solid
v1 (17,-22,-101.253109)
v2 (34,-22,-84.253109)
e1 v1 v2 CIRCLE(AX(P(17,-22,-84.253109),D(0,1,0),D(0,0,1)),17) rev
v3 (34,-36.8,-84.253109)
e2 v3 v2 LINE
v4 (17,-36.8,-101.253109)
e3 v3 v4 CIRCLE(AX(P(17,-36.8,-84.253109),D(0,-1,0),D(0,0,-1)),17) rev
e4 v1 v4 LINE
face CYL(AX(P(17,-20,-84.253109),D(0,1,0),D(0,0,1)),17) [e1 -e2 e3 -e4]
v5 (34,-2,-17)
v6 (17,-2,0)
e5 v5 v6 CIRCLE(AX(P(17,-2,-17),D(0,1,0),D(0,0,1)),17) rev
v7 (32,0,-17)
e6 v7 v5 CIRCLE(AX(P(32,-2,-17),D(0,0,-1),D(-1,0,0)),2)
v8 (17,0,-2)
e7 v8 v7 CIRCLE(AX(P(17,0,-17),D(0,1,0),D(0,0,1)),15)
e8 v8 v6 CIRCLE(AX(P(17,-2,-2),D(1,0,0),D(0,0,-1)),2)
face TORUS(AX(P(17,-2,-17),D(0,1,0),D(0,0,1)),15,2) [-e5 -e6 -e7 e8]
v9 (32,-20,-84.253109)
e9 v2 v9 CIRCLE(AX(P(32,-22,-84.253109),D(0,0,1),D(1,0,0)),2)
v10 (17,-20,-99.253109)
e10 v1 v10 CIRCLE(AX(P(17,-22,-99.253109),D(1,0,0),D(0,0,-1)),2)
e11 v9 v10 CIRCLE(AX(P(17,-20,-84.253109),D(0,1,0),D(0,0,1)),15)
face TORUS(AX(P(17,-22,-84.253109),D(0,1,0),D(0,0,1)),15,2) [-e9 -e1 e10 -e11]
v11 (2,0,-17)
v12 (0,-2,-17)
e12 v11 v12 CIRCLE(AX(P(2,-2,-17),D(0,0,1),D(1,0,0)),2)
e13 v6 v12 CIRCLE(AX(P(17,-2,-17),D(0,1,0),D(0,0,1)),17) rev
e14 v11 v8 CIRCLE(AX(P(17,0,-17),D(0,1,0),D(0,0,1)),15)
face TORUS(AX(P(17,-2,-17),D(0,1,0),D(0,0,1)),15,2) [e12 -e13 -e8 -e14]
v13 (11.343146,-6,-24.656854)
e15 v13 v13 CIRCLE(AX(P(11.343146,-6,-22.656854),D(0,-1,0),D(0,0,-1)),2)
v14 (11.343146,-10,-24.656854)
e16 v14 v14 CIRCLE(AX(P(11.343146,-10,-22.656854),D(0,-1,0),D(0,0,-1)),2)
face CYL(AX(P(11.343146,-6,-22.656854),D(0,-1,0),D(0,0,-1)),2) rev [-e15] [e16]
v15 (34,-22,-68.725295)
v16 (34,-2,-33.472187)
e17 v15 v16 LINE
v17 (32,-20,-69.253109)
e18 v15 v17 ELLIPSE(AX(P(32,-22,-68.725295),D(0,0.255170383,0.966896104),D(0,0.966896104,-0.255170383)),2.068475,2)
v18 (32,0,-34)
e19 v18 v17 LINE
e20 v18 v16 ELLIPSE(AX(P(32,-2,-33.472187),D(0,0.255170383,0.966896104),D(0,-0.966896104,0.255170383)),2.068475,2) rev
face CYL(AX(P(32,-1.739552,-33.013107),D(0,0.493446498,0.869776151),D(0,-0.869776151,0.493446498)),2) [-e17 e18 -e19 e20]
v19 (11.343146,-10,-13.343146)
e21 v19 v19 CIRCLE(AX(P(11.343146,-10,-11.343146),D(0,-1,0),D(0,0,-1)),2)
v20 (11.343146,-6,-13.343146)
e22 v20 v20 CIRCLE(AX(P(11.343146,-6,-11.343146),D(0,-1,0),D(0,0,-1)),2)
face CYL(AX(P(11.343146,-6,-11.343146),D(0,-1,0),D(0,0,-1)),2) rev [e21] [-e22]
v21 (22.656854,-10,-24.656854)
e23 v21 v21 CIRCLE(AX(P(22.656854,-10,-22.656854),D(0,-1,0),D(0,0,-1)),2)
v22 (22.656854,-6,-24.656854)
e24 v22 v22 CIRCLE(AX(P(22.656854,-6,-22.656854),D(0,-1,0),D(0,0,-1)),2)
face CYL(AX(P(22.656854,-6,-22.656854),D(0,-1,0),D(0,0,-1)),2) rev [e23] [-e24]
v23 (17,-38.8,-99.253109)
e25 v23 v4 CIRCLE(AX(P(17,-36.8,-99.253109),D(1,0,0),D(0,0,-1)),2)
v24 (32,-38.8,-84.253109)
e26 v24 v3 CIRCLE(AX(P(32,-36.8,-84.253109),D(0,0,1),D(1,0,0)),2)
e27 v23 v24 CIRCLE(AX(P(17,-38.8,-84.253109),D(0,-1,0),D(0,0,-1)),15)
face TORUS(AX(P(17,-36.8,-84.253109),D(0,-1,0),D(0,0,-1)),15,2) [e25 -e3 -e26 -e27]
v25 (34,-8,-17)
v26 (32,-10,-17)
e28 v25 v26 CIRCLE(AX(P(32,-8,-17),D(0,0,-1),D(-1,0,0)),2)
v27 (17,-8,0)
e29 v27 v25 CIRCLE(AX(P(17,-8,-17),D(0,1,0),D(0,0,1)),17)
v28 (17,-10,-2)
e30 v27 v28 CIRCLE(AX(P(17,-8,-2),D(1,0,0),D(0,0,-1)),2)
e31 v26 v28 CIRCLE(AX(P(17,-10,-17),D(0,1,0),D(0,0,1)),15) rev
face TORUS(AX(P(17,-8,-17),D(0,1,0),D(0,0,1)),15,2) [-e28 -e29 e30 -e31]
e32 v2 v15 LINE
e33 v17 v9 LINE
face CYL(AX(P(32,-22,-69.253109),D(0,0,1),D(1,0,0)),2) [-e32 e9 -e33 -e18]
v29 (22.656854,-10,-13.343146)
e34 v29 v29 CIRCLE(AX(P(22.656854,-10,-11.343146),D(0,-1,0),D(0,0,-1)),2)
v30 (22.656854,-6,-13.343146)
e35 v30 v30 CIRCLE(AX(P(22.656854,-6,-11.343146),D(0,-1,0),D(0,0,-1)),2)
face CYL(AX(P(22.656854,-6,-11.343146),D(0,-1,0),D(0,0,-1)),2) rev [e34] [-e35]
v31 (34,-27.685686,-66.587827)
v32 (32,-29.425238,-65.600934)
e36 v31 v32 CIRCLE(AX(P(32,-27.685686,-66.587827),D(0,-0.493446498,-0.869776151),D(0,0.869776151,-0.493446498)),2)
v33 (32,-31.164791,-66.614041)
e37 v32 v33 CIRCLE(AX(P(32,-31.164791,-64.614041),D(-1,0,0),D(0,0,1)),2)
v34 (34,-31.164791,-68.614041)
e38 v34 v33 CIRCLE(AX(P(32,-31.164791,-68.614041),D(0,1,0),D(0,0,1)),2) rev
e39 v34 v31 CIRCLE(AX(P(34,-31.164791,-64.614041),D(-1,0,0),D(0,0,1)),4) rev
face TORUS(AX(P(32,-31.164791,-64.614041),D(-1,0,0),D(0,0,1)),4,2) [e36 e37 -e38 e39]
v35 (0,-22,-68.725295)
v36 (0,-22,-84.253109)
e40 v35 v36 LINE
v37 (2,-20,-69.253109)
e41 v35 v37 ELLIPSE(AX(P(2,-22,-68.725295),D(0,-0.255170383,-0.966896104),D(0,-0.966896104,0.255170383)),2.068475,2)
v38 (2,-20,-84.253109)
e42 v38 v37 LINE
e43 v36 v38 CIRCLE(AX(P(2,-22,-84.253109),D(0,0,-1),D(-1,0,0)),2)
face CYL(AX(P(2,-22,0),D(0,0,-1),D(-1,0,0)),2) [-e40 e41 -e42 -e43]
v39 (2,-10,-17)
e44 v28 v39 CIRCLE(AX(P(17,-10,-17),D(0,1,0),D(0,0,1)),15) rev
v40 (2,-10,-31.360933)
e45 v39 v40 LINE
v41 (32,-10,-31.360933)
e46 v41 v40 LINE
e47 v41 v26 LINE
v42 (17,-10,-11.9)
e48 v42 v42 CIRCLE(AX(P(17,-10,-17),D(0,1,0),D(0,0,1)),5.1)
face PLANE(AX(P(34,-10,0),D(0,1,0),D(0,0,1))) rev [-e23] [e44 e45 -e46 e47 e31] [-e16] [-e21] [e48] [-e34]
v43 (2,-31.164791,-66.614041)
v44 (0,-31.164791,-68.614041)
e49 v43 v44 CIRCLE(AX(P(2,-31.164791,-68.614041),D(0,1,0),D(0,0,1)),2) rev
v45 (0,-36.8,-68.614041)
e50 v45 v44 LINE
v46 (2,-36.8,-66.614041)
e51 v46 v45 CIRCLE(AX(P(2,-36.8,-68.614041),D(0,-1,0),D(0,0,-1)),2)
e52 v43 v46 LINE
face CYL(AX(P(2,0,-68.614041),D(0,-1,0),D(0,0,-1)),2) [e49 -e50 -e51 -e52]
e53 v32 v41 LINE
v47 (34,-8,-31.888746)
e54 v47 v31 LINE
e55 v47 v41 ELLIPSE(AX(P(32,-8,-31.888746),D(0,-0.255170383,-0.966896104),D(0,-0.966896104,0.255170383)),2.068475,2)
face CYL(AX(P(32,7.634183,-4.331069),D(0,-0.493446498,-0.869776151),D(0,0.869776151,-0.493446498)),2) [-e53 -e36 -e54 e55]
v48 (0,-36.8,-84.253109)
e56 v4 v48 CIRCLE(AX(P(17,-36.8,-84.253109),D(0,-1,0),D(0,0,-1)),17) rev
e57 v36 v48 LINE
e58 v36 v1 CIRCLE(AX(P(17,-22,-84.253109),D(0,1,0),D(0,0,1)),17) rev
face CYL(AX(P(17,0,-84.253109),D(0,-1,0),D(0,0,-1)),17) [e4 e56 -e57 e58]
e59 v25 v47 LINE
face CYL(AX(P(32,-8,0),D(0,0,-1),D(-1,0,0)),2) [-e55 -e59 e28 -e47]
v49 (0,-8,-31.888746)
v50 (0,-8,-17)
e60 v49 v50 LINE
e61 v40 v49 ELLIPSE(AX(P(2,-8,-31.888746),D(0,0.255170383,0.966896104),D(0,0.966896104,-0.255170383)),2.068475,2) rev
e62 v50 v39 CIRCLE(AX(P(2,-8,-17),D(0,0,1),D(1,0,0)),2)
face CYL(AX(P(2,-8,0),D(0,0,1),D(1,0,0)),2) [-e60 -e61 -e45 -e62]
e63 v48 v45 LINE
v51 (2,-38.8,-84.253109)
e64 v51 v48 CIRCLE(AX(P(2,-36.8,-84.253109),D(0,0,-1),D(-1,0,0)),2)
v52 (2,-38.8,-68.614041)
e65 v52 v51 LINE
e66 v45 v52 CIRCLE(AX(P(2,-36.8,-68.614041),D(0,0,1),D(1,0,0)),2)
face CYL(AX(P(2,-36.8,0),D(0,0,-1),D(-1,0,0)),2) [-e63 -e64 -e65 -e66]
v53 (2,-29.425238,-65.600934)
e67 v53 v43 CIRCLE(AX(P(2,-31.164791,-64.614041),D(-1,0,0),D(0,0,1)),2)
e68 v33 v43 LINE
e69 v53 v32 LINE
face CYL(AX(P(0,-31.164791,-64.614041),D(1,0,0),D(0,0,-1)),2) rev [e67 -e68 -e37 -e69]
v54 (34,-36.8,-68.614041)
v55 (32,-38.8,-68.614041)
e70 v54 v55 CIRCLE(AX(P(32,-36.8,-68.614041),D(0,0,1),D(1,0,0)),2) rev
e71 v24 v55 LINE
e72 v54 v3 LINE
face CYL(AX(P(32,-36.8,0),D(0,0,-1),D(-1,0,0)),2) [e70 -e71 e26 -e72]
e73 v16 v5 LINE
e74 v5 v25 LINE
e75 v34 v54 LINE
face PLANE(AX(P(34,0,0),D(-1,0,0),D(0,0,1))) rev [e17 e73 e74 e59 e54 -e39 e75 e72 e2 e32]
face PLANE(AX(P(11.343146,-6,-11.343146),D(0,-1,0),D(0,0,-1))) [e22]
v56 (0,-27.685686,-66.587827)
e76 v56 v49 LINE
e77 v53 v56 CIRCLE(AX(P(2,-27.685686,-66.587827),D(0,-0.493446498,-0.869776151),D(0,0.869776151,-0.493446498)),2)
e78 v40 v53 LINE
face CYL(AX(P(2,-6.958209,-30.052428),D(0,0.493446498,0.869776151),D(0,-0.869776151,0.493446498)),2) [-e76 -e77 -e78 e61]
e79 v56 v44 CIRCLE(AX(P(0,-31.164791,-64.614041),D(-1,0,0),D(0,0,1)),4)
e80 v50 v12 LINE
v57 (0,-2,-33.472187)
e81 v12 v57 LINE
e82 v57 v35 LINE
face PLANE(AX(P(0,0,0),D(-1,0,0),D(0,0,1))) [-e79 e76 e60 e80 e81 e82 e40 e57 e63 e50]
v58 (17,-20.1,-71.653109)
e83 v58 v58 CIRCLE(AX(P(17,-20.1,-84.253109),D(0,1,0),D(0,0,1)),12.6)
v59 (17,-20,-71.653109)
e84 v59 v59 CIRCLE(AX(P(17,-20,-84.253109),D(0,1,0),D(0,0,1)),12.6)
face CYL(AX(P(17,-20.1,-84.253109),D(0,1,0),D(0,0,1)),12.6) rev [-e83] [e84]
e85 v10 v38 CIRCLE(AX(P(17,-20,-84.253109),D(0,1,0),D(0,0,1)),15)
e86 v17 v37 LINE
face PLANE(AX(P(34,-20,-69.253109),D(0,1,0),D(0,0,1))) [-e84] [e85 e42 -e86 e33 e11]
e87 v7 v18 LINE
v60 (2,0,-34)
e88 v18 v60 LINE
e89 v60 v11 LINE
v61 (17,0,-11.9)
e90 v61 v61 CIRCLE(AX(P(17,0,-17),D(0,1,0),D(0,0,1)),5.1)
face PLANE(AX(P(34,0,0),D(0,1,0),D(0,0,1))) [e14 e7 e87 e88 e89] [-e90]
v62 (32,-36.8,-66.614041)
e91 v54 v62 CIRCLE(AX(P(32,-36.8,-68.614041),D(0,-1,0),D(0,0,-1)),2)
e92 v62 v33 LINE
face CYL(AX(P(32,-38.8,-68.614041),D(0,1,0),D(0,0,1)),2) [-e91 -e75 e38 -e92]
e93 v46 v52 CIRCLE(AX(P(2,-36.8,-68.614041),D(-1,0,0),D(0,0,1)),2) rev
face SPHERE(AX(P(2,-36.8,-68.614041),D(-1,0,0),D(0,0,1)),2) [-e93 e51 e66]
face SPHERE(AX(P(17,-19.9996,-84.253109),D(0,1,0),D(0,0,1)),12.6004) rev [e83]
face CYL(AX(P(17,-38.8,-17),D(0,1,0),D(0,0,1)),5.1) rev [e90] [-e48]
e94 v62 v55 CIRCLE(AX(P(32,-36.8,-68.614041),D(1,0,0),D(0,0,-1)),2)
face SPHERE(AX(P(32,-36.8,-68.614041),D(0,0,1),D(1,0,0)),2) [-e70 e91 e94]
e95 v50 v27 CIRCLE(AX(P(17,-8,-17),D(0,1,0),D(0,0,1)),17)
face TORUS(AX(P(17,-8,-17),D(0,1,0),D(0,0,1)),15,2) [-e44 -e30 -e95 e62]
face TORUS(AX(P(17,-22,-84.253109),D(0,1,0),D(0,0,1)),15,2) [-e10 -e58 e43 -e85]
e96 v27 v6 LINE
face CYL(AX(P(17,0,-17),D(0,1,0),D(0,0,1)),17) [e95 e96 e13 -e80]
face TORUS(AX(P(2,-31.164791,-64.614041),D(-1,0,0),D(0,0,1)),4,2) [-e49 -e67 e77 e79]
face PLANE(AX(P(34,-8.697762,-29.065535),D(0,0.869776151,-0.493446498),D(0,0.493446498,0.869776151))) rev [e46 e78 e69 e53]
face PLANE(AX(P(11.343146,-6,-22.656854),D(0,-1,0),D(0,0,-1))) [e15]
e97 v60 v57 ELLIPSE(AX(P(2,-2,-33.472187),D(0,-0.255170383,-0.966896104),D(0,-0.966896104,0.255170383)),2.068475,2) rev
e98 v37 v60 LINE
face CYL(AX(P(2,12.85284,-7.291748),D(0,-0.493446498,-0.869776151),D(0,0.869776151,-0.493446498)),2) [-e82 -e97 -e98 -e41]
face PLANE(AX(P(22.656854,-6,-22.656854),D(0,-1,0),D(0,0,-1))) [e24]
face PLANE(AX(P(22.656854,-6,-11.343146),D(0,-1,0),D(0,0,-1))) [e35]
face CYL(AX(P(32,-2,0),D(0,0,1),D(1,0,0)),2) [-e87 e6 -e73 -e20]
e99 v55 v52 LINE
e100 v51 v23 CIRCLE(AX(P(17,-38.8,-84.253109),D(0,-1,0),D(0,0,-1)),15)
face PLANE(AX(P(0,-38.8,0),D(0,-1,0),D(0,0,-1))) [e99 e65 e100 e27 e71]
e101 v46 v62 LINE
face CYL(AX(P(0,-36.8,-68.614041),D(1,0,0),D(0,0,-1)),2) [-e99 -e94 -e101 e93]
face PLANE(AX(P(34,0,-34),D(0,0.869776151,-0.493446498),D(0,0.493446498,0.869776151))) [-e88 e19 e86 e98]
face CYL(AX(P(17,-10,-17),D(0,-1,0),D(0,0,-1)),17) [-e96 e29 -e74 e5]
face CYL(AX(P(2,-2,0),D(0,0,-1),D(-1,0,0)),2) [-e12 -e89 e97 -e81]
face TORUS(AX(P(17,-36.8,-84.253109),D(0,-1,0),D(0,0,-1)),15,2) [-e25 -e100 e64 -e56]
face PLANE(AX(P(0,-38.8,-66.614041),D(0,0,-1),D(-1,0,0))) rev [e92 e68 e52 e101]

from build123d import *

# Parameters (mm, degrees)
PROFILEEXTRUDE_THIN1_DEPTH          = 34
DOMEPADEXTENSIONSKETCH1_W           = 34
DOMEPADEXTENSIONSKETCH1_H           = 34.639067238
DOMEPADEXTENSIONBOSS_EXTRUDE1_DEPTH = 8.8
FILLET1_R                           = 17
FILLET2_R                           = 17
FLANGENUTHOLESKETCH4_R              = 5.1
FLANGENUTHOLECUT_EXTRUDE5_DEPTH     = 114.638162666
DOMEINDENTSKETCH6_R                 = 12.6
DOMEINDENTCUT_EXTRUDE8_DEPTH        = 0.1
DOME2_FACE_RADIUS                   = 12.6
DOME2_HEIGHT                        = 12.5
FILLET3_R                           = 17
FILLET4_R                           = 17
BOTTOMBOUNDARYFILLET5_R             = 2
FLANGENUTHOLESSKETCH2_R             = 2
FLANGENUTHOLESCUT_EXTRUDE1_DEPTH    = 4
FILLET6_R                           = 2


with BuildPart() as part:
    # ProfileSketch1 → ProfileExtrude-Thin1 (new body)
    with BuildSketch(Plane(origin=(0, 0, 0), x_dir=(0, 0, -1), z_dir=(1, 0, 0))):
        Polygon((0, 0), (34, 0), (69.253108664, -20), (101.253108664, -20), (101.253108664, -30), (66.614041426, -30), (31.360932762, -10), (0, -10), align=None)
    extrude(amount=PROFILEEXTRUDE_THIN1_DEPTH)

    # DomePadExtensionSketch1 → DomePadExtensionBoss-Extrude1 (add)
    with BuildSketch(Plane.XZ.offset(30)):
        with Locations((17, -83.933575045)):
            Rectangle(DOMEPADEXTENSIONSKETCH1_W, DOMEPADEXTENSIONSKETCH1_H)
    extrude(amount=DOMEPADEXTENSIONBOSS_EXTRUDE1_DEPTH)

    # Fillet1
    fillet1_edges = [part.edges().sort_by_distance(p)[0] for p in [
        (34, -5, 0),
    ]]
    fillet(fillet1_edges, radius=FILLET1_R)

    # Fillet2
    fillet2_edges = [part.edges().sort_by_distance(p)[0] for p in [
        (0, -5, 0),
    ]]
    fillet(fillet2_edges, radius=FILLET2_R - 0.0001)  # a hair under: the kernel refuses the full size

    # FlangeNutHoleSketch4 → FlangeNutHoleCut-Extrude5 (cut, through all)
    with BuildSketch(Plane(origin=(0, 0, 0), x_dir=(1, 0, 0), z_dir=(0, 1, 0))):
        with Locations(Location((17, 17, 0), (0, 0, 270))):
            Circle(FLANGENUTHOLESKETCH4_R)
    extrude(amount=-FLANGENUTHOLECUT_EXTRUDE5_DEPTH, mode=Mode.SUBTRACT)

    # DomeIndentSketch6 → DomeIndentCut-Extrude8 (cut)
    with BuildSketch(Plane(origin=(0, -20, 0), x_dir=(1, 0, 0), z_dir=(0, 1, 0))):
        with Locations(Location((17, 84.253108664, 0), (0, 0, 270))):
            Circle(DOMEINDENTSKETCH6_R)
    extrude(amount=-DOMEINDENTCUT_EXTRUDE8_DEPTH, mode=Mode.SUBTRACT)

    # Dome2: a dome of height H over a round flat face of radius A is a cap of a sphere of radius (A * A + H * H) / (2 * H)
    dome2_r = (DOME2_FACE_RADIUS * DOME2_FACE_RADIUS + DOME2_HEIGHT * DOME2_HEIGHT) / (2 * DOME2_HEIGHT)
    dome2_base = Plane((17, -20.1, -84.253108664), z_dir=(0, -1, 0))
    with Locations(dome2_base.offset(DOME2_HEIGHT - dome2_r)):
        dome2_ball = Sphere(dome2_r, mode=Mode.PRIVATE)
    add(split(dome2_ball, bisect_by=dome2_base, keep=Keep.TOP, mode=Mode.PRIVATE), mode=Mode.SUBTRACT)

    # Fillet3
    fillet3_edges = [part.edges().sort_by_distance(p)[0] for p in [
        (34, -29.4, -101.253108664),
    ]]
    fillet(fillet3_edges, radius=FILLET3_R)

    # Fillet4
    fillet4_edges = [part.edges().sort_by_distance(p)[0] for p in [
        (0, -29.4, -101.253108664),
    ]]
    fillet(fillet4_edges, radius=FILLET4_R - 0.0001)  # a hair under: the kernel refuses the full size

    # BottomBoundaryFillet5
    bottomboundaryfillet5_edges = [part.edges().sort_by_distance(p)[0] for p in [
        (17, -30, -66.614041426),
        (0, -34.4, -66.614041426),
        (34, -34.4, -66.614041426),
        (0, -38.8, -75.433625045),
        (17, -38.8, -66.614041426),
        (34, -20, -48.987487094),
        (34, -10, -24.180466381),
        (29.02081528, -10, -4.97918472),
        (0, -10, -24.180416381),
        (4.979155431, -10, -4.979155431),
        (34, -38.8, -75.433575045),
        (29.02081528, -38.8, -96.273923944),
        (4.979155431, -38.8, -96.273953234),
        (0, -20, -48.987487094),
    ]]
    fillet(bottomboundaryfillet5_edges, radius=BOTTOMBOUNDARYFILLET5_R)

    # FlangeNutHolesSketch2 → FlangeNutHolesCut-Extrude1 (cut)
    with BuildSketch(Plane.XZ.offset(10)):
        with Locations(Location((11.343145751, -11.343145751, 0), (0, 0, 270))):
            Circle(FLANGENUTHOLESSKETCH2_R)
        with Locations(Location((22.656854249, -11.343145751, 0), (0, 0, 270))):
            Circle(FLANGENUTHOLESSKETCH2_R)
        with Locations(Location((22.656854249, -22.656854249, 0), (0, 0, 270))):
            Circle(FLANGENUTHOLESSKETCH2_R)
        with Locations(Location((11.343145751, -22.656854249, 0), (0, 0, 270))):
            Circle(FLANGENUTHOLESSKETCH2_R)
    extrude(amount=-FLANGENUTHOLESCUT_EXTRUDE1_DEPTH, mode=Mode.SUBTRACT)

    # Fillet6
    fillet6_edges = [part.edges().sort_by_distance(p)[0] for p in [
        (34, -20, -76.753108664),
        (34, -10, -51.626554332),
        (34, 0, -25.5),
        (29.02081528, 0, -4.97918472),
        (0, 0, -25.49995),
        (4.979155431, 0, -4.979155431),
        (29.02081528, -20, -96.273923944),
        (4.979155431, -20, -96.273953234),
        (0, -10, -51.626554332),
        (0, -20, -76.753158664),
    ]]
    fillet(fillet6_edges, radius=FILLET6_R)


solid = part.part
